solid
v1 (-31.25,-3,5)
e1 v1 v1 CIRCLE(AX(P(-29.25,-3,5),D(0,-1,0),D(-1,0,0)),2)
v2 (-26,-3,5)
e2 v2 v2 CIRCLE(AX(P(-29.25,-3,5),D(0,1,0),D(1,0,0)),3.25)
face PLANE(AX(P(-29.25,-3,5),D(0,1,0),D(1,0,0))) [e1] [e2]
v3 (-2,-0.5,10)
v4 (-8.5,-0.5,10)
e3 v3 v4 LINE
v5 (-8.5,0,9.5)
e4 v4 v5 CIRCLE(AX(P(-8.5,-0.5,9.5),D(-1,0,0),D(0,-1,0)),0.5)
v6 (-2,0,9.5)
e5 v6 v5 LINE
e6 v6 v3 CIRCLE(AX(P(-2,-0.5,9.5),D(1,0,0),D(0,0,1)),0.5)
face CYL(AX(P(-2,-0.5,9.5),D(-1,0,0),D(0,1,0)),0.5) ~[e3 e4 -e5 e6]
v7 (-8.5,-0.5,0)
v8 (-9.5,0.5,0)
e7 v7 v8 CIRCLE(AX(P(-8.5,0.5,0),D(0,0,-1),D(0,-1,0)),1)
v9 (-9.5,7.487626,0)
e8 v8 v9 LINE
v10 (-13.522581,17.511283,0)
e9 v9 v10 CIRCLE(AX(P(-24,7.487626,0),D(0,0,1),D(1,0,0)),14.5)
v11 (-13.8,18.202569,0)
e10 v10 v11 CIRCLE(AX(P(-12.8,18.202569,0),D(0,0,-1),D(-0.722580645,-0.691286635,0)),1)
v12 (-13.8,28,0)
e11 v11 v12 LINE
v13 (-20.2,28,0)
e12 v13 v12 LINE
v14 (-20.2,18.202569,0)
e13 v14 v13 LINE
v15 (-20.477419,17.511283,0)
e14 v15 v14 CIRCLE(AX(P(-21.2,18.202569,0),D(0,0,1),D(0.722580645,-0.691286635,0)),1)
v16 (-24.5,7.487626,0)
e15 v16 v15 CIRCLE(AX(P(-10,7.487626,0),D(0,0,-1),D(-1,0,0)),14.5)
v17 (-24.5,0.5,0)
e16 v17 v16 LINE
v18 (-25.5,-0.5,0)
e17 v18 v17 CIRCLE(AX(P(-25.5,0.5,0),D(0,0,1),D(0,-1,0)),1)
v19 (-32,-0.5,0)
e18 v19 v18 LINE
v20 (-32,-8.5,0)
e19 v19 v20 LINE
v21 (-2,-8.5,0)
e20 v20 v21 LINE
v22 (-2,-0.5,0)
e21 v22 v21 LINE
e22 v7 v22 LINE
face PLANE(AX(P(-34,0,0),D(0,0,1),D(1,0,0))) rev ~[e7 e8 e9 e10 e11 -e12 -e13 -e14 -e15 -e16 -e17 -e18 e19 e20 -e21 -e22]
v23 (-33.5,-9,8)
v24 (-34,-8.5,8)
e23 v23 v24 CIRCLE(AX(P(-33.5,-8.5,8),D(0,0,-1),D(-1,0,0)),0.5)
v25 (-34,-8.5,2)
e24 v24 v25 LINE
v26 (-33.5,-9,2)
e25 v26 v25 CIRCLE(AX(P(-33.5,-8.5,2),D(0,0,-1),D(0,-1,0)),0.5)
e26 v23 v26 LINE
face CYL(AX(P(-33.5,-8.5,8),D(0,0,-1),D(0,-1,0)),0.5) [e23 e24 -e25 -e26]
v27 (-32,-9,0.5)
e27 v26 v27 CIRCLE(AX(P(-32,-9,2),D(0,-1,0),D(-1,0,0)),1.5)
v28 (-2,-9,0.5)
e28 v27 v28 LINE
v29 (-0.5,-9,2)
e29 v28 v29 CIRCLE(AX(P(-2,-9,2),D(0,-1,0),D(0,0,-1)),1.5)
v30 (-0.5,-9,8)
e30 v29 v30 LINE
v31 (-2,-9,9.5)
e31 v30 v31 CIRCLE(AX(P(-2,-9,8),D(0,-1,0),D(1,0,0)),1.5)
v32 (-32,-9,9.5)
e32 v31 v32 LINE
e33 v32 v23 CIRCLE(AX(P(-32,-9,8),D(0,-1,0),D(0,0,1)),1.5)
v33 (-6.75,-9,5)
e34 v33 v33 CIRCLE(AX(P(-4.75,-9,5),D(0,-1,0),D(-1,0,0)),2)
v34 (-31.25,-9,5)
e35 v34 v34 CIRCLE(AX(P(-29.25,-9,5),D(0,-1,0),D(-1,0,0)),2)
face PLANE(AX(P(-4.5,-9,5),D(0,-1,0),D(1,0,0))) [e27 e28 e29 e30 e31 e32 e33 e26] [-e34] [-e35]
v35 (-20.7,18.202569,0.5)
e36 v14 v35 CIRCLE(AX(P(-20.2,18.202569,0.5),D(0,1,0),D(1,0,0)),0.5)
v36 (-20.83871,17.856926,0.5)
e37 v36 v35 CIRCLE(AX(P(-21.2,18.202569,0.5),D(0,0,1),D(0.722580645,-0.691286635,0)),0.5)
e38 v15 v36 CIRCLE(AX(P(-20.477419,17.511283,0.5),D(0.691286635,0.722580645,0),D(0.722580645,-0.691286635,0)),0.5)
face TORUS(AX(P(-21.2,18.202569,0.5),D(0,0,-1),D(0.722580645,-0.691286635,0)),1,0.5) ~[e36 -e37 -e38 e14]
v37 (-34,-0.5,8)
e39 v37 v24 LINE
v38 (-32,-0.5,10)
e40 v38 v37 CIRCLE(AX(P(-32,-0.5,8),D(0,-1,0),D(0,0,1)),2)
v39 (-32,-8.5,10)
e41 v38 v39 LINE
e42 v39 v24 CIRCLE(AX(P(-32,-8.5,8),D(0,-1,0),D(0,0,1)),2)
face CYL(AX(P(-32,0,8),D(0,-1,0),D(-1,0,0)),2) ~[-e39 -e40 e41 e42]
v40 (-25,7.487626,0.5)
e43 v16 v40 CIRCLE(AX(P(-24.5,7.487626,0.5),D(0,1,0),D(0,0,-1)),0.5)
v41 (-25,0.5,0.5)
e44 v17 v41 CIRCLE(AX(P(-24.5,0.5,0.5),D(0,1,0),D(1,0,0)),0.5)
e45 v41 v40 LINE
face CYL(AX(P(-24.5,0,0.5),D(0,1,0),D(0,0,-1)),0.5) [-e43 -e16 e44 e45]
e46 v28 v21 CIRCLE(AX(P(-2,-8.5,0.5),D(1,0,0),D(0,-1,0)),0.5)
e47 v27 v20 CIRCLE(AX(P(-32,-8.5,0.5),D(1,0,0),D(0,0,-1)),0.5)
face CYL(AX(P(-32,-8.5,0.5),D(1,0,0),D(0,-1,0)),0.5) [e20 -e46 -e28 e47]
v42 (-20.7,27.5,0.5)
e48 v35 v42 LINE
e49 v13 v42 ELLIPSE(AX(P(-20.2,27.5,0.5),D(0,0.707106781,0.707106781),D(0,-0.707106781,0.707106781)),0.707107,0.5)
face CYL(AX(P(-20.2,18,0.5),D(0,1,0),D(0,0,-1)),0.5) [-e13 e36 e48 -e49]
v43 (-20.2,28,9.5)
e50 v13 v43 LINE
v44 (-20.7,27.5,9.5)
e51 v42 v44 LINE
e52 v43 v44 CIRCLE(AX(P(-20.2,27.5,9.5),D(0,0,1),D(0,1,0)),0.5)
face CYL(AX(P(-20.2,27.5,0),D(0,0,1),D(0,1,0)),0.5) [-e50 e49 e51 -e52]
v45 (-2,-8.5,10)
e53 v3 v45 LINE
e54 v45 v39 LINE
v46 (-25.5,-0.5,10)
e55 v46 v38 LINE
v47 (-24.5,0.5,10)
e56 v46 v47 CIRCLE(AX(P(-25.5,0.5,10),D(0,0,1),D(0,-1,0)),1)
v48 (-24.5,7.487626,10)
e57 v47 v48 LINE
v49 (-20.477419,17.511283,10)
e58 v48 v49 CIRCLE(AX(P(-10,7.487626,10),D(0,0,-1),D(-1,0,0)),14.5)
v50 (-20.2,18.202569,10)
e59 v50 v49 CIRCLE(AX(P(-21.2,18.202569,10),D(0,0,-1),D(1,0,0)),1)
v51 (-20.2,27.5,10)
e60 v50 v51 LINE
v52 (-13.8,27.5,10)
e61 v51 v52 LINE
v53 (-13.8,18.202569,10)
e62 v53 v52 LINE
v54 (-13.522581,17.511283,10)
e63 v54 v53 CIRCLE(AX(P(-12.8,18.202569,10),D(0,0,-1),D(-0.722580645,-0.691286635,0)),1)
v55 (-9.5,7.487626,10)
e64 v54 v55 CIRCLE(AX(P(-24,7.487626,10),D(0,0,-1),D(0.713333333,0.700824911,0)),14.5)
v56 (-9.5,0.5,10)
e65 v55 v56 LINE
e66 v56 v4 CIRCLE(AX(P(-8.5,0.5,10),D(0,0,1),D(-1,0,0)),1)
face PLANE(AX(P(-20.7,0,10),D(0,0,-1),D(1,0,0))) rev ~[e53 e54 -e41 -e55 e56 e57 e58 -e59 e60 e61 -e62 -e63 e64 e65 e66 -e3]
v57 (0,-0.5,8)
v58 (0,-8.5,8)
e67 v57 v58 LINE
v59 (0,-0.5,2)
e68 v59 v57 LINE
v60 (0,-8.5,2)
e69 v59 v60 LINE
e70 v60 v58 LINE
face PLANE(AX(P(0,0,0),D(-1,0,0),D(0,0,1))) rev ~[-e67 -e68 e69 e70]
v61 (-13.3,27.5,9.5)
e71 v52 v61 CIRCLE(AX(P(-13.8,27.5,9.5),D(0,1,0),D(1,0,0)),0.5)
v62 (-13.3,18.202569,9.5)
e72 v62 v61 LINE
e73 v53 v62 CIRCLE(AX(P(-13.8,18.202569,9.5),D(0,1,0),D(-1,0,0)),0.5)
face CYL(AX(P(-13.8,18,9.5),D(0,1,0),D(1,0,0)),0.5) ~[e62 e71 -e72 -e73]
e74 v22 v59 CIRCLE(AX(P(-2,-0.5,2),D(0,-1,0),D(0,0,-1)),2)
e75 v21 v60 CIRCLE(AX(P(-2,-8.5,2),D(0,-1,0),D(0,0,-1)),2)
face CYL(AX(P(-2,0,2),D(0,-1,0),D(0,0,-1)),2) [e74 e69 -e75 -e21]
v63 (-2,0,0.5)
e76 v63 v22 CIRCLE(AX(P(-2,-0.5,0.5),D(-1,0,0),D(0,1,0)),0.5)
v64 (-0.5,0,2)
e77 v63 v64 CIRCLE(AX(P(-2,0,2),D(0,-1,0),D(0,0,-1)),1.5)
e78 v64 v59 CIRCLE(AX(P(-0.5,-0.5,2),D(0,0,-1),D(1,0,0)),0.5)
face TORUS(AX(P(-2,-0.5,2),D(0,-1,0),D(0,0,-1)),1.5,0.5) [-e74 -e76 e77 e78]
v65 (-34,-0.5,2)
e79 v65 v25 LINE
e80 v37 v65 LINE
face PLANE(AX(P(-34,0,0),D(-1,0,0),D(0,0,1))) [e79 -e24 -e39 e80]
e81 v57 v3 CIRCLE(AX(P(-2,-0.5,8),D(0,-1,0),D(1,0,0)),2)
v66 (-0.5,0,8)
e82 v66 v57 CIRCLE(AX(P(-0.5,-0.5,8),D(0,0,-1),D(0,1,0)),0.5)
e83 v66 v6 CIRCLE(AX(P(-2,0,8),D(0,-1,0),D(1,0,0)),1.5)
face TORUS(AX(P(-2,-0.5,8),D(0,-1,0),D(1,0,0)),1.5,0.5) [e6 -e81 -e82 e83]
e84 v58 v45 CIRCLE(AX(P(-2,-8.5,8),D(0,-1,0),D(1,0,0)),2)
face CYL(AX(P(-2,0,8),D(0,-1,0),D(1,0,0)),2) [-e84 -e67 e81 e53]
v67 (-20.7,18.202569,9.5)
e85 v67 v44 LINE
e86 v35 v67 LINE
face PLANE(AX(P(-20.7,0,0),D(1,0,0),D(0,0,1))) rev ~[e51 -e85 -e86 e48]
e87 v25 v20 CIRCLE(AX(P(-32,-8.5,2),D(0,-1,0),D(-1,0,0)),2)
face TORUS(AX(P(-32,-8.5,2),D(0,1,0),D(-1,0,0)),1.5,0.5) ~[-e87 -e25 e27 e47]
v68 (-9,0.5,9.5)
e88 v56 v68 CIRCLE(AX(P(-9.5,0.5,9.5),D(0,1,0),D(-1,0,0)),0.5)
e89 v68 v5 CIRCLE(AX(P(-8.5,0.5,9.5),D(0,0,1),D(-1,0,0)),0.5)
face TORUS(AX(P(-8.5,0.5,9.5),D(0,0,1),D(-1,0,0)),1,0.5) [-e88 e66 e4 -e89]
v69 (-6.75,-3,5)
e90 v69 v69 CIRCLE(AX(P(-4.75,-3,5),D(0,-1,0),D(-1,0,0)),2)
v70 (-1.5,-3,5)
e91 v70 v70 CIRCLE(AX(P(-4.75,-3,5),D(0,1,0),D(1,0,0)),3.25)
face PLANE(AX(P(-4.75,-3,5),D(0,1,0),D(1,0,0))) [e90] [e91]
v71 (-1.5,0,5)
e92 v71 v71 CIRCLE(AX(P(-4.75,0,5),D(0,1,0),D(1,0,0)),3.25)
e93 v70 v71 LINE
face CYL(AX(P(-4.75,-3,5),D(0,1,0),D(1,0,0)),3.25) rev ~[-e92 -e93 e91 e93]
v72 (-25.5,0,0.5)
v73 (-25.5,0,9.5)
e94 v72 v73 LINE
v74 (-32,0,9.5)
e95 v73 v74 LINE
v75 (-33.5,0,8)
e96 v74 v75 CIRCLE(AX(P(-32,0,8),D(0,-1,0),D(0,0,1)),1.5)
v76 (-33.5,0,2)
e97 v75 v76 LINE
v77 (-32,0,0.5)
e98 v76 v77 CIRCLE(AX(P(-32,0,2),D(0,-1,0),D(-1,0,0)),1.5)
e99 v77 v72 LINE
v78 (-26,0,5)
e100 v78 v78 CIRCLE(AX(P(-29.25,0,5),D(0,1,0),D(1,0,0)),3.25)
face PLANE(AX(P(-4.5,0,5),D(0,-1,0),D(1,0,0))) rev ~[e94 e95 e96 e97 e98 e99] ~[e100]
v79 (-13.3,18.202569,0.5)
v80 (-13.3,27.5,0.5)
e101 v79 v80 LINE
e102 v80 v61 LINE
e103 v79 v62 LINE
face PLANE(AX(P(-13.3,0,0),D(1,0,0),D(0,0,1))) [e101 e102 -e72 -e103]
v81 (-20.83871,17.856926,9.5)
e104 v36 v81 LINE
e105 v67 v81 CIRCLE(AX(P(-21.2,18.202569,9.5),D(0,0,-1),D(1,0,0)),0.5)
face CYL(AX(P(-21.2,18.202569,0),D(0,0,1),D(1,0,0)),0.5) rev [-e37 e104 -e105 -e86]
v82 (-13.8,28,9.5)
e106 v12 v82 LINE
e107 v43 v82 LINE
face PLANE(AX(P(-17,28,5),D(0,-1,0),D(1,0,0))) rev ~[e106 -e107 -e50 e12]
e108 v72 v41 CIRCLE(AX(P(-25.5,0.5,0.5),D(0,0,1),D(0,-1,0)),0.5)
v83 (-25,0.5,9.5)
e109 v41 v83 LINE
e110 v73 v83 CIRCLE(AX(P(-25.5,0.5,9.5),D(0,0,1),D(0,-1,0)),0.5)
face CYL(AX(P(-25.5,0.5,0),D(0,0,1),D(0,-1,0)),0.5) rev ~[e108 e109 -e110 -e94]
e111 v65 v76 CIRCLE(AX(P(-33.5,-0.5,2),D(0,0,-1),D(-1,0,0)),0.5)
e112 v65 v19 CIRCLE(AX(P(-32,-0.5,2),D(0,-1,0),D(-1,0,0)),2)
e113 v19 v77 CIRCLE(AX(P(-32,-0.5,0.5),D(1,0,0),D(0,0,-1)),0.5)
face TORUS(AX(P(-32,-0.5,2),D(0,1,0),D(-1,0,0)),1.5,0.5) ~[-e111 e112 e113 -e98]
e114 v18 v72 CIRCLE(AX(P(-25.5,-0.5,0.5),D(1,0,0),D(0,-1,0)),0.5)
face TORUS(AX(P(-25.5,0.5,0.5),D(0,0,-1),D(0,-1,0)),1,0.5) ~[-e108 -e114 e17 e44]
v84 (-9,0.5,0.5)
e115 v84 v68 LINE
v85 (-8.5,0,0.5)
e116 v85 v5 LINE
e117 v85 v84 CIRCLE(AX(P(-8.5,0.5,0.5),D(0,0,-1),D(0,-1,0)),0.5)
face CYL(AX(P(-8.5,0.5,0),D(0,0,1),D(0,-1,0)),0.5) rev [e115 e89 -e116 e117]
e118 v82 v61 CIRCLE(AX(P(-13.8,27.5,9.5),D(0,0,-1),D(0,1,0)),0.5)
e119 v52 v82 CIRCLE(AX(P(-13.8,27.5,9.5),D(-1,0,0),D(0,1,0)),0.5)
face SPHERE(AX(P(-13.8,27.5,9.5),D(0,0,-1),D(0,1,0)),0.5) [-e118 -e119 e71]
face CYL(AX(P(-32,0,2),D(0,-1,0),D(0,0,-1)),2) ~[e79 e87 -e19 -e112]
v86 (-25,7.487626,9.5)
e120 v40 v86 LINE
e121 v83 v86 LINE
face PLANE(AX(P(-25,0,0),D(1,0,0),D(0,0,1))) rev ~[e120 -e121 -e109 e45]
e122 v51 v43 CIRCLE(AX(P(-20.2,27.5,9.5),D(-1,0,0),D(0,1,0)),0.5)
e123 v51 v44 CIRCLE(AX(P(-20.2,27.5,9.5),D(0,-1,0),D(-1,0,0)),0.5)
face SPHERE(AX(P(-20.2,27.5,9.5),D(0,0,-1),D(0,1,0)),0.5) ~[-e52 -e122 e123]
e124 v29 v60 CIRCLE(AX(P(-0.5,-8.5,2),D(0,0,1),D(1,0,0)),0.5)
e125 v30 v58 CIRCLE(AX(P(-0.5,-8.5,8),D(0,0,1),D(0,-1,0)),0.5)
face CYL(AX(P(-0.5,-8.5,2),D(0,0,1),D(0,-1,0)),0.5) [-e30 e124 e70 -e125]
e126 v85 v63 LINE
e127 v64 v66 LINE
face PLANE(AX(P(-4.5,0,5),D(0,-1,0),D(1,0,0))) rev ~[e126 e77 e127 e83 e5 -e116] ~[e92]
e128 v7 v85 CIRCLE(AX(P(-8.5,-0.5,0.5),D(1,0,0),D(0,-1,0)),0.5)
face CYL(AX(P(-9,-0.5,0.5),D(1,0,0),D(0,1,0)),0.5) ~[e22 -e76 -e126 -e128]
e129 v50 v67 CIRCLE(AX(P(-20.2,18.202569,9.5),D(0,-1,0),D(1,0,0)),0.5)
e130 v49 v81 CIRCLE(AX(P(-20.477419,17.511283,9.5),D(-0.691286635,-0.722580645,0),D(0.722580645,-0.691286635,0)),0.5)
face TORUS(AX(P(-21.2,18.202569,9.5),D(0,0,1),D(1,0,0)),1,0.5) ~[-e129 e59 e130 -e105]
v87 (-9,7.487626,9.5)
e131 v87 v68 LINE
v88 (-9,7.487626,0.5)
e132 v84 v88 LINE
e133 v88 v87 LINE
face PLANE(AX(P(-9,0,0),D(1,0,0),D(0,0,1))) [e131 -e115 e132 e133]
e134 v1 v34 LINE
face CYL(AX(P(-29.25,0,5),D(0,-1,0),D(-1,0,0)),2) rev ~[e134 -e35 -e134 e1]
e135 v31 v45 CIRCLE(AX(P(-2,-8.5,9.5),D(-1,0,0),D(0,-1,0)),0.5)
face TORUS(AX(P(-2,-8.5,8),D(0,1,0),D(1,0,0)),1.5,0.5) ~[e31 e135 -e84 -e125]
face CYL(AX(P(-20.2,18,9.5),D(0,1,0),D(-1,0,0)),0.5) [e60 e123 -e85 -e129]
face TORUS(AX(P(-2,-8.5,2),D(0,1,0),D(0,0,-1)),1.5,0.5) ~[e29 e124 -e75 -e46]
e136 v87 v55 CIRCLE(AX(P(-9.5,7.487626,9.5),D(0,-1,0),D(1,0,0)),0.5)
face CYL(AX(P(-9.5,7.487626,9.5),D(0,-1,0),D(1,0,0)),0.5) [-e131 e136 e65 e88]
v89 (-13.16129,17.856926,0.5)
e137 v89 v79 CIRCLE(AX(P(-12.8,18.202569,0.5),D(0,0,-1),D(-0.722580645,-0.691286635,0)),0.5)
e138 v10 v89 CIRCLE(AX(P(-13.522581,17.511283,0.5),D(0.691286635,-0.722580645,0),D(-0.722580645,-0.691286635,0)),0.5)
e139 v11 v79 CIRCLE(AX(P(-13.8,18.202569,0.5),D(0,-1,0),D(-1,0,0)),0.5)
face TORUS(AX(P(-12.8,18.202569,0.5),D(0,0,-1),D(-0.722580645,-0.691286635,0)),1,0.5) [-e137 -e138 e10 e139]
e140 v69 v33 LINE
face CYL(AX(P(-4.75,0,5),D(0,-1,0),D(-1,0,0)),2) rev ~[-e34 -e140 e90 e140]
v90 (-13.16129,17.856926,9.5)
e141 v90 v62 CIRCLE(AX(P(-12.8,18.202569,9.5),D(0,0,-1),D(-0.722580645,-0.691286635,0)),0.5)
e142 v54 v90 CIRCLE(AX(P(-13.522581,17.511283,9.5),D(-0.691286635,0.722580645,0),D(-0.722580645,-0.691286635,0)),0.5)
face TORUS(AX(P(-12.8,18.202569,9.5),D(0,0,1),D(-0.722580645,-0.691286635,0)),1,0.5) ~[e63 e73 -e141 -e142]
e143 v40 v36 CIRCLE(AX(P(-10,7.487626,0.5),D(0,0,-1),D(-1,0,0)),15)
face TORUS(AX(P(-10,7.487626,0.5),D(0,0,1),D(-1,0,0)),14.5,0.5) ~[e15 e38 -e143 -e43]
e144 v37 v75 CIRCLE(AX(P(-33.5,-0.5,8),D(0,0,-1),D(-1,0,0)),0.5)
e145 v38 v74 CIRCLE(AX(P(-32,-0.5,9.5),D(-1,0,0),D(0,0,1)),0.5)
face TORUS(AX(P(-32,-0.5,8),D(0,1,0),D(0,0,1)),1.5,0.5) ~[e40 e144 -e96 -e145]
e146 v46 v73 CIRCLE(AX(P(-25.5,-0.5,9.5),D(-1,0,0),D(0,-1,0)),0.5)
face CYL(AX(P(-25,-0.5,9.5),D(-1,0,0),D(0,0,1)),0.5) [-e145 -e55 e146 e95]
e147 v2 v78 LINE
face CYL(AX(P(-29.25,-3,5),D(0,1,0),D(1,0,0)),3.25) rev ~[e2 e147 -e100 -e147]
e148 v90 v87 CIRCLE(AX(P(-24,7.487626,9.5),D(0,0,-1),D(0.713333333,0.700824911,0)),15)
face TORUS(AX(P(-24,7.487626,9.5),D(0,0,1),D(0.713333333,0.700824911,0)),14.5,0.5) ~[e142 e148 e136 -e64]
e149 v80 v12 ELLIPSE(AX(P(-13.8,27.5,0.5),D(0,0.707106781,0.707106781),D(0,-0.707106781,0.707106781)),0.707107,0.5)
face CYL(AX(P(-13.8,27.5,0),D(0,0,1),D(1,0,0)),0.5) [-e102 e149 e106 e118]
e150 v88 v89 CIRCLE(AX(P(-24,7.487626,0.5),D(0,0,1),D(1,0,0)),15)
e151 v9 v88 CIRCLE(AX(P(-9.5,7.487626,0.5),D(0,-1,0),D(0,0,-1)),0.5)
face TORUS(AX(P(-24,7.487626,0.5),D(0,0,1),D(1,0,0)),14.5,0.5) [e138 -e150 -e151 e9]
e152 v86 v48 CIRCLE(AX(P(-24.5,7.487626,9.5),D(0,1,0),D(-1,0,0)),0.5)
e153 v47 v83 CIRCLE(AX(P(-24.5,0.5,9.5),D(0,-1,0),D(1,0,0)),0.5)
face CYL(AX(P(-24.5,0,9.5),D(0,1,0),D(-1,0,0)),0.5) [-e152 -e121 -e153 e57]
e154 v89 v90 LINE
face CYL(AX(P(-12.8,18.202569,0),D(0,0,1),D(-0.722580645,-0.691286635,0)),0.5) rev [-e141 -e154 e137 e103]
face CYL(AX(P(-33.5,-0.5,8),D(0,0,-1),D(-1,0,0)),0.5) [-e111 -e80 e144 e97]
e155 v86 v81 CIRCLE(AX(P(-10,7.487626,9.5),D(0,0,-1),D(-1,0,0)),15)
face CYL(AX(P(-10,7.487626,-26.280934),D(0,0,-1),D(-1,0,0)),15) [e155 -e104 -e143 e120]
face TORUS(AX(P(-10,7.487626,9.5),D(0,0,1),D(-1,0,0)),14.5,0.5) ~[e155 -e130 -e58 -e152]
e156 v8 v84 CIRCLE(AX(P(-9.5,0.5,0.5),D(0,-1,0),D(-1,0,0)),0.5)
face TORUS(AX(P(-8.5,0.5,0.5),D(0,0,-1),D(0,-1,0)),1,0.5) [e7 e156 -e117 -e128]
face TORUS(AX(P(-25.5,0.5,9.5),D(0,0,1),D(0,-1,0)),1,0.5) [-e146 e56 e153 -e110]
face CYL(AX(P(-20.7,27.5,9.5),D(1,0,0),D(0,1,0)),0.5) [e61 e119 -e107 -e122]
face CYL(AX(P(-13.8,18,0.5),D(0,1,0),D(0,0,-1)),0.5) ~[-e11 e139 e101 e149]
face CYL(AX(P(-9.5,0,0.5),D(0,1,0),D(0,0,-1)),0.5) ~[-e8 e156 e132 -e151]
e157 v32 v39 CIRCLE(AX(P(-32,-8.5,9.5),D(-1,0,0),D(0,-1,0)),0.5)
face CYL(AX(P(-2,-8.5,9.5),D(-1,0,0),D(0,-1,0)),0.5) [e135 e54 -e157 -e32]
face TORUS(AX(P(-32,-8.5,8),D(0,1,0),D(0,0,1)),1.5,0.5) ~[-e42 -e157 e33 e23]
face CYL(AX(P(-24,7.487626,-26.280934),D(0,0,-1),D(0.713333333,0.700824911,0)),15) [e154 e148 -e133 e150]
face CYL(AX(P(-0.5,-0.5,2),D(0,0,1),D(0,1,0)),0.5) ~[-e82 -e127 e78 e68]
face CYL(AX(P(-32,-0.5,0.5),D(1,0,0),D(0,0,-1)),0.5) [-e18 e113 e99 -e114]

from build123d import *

# Parameters (mm, degrees)
F0_W           = 9
F0_H           = 10
F0_W_2         = 4.3
F0_W_3         = 7.4
F1_DEPTH       = 9
F2_D           = 4
F2_DEPTH       = 12
F2_CBORE_D     = 6.5
F2_CBORE_DEPTH = 3
F2_TIP         = 1.2017212381
F3_DEPTH       = 18
F4_DEPTH       = 28
F5_T1_DEPTH    = 62.5618683077
F6_R           = 2
F7_R           = 0.5


# Not quite as in the source:
# - a fillet or chamfer that OpenCascade refuses, or shapes differently, is made with other operations: its cross-section is extruded or revolved along the edge and cut away or added


with BuildPart() as f1:
    # F0 (on Front) → F1 (new body)
    with BuildSketch(Plane.XZ):
        with Locations((-4.5, 5)):
            Rectangle(F0_W, F0_H)
        with Locations((-11.15, 5)):
            Rectangle(F0_W_2, F0_H)
        with Locations((-17, 5)):
            Rectangle(F0_W_3, F0_H)
        with Locations((-22.85, 5)):
            Rectangle(F0_W_2, F0_H)
        with Locations((-29.5, 5)):
            Rectangle(F0_W, F0_H)
    extrude(amount=F1_DEPTH)

    # F2
    with Locations(Plane(origin=(0, 0, 0), x_dir=(1, 0, 0), z_dir=(0, 1, 0))):
        with Locations((-29.25, -5), (-4.75, -5)):
            CounterBoreHole(F2_D / 2, F2_CBORE_D / 2, F2_CBORE_DEPTH, depth=F2_DEPTH)
            with Locations((0, 0, -(F2_DEPTH + F2_TIP / 2))):  # 118° drill point
                Cone(0, F2_D / 2, F2_TIP, mode=Mode.SUBTRACT)

    # F0 (on Front) → F3 (join)
    with BuildSketch(Plane.XZ):
        with Locations((-22.85, 5)):
            Rectangle(F0_W_2, F0_H)
        with Locations((-17, 5)):
            Rectangle(F0_W_3, F0_H)
        with Locations((-11.15, 5)):
            Rectangle(F0_W_2, F0_H)
    extrude(amount=-F3_DEPTH)

    # F0 (on Front) → F4 (join)
    with BuildSketch(Plane.XZ):
        with Locations((-17, 5)):
            Rectangle(F0_W_3, F0_H)
    extrude(amount=-F4_DEPTH)

    # F5: fillet of radius 15 on 2 edges, made by hand

    # F5_s2 → F5_t1 (cut)
    with BuildSketch(Plane.XY.offset(-26.2809341539)):
        with BuildLine():
            ThreePointArc((-13.3, 18), (-10.1165566231, 13.1665346843), (-9, 7.4876263385))
            Line((-9, 7.4876263385), (-9, 18))
            Line((-9, 18), (-13.3, 18))
        make_face()
        with BuildLine():
            ThreePointArc((-25, 7.4876263385), (-23.8834433769, 13.1665346843), (-20.7, 18))
            Line((-20.7, 18), (-25, 18))
            Line((-25, 18), (-25, 7.4876263385))
        make_face()
    extrude(amount=F5_T1_DEPTH, mode=Mode.SUBTRACT)

    # F6
    f6_edges = [f1.edges().sort_by_distance(p)[0] for p in [
        (0, -4.5, 10),
        (0, -4.5, 0),
        (-34, -4.5, 0),
        (-34, -4.5, 10),
    ]]
    fillet(f6_edges, radius=F6_R)

    # F7
    f7_edges = [f1.edges().sort_by_distance(p)[0] for p in [
        (-9, 0, 5),
        (-25, 0, 5),
        (-25, 7.487626, 5),
        (-20.7, 18, 5),
        (-13.3, 18, 5),
        (-13.3, 28, 5),
        (-20.7, 28, 5),
        (-17, 28, 10),
        (-20.7, 23, 10),
        (-10.116557, 13.166535, 10),
        (-17, -9, 10),
        (0, 0, 5),
        (0, -9, 5),
        (-5.5, 0, 0),
        (-0.585786, 0, 0.585786),
        (-5.5, 0, 10),
        (-0.585786, 0, 9.414214),
        (-0.585786, -9, 0.585786),
        (-0.585786, -9, 9.414214),
        (-17, -9, 0),
        (-33.414214, -9, 0.585786),
        (-33.414214, -9, 9.414214),
        (-34, -9, 5),
        (-28.5, 0, 0),
        (-25, 3.743813, 0),
        (-23.883443, 13.166535, 0),
        (-20.7, 23, 0),
        (-9, 3.743813, 0),
        (-13.3, 23, 0),
        (-10.116557, 13.166535, 0),
        (-9, 3.743813, 10),
        (-13.3, 23, 10),
        (-28.5, 0, 10),
        (-25, 3.743813, 10),
        (-23.883443, 13.166535, 10),
        (-33.414214, 0, 0.585786),
        (-33.414214, 0, 9.414214),
        (-34, 0, 5),
    ]]
    fillet(f7_edges, radius=F7_R)


solid = f1.part
